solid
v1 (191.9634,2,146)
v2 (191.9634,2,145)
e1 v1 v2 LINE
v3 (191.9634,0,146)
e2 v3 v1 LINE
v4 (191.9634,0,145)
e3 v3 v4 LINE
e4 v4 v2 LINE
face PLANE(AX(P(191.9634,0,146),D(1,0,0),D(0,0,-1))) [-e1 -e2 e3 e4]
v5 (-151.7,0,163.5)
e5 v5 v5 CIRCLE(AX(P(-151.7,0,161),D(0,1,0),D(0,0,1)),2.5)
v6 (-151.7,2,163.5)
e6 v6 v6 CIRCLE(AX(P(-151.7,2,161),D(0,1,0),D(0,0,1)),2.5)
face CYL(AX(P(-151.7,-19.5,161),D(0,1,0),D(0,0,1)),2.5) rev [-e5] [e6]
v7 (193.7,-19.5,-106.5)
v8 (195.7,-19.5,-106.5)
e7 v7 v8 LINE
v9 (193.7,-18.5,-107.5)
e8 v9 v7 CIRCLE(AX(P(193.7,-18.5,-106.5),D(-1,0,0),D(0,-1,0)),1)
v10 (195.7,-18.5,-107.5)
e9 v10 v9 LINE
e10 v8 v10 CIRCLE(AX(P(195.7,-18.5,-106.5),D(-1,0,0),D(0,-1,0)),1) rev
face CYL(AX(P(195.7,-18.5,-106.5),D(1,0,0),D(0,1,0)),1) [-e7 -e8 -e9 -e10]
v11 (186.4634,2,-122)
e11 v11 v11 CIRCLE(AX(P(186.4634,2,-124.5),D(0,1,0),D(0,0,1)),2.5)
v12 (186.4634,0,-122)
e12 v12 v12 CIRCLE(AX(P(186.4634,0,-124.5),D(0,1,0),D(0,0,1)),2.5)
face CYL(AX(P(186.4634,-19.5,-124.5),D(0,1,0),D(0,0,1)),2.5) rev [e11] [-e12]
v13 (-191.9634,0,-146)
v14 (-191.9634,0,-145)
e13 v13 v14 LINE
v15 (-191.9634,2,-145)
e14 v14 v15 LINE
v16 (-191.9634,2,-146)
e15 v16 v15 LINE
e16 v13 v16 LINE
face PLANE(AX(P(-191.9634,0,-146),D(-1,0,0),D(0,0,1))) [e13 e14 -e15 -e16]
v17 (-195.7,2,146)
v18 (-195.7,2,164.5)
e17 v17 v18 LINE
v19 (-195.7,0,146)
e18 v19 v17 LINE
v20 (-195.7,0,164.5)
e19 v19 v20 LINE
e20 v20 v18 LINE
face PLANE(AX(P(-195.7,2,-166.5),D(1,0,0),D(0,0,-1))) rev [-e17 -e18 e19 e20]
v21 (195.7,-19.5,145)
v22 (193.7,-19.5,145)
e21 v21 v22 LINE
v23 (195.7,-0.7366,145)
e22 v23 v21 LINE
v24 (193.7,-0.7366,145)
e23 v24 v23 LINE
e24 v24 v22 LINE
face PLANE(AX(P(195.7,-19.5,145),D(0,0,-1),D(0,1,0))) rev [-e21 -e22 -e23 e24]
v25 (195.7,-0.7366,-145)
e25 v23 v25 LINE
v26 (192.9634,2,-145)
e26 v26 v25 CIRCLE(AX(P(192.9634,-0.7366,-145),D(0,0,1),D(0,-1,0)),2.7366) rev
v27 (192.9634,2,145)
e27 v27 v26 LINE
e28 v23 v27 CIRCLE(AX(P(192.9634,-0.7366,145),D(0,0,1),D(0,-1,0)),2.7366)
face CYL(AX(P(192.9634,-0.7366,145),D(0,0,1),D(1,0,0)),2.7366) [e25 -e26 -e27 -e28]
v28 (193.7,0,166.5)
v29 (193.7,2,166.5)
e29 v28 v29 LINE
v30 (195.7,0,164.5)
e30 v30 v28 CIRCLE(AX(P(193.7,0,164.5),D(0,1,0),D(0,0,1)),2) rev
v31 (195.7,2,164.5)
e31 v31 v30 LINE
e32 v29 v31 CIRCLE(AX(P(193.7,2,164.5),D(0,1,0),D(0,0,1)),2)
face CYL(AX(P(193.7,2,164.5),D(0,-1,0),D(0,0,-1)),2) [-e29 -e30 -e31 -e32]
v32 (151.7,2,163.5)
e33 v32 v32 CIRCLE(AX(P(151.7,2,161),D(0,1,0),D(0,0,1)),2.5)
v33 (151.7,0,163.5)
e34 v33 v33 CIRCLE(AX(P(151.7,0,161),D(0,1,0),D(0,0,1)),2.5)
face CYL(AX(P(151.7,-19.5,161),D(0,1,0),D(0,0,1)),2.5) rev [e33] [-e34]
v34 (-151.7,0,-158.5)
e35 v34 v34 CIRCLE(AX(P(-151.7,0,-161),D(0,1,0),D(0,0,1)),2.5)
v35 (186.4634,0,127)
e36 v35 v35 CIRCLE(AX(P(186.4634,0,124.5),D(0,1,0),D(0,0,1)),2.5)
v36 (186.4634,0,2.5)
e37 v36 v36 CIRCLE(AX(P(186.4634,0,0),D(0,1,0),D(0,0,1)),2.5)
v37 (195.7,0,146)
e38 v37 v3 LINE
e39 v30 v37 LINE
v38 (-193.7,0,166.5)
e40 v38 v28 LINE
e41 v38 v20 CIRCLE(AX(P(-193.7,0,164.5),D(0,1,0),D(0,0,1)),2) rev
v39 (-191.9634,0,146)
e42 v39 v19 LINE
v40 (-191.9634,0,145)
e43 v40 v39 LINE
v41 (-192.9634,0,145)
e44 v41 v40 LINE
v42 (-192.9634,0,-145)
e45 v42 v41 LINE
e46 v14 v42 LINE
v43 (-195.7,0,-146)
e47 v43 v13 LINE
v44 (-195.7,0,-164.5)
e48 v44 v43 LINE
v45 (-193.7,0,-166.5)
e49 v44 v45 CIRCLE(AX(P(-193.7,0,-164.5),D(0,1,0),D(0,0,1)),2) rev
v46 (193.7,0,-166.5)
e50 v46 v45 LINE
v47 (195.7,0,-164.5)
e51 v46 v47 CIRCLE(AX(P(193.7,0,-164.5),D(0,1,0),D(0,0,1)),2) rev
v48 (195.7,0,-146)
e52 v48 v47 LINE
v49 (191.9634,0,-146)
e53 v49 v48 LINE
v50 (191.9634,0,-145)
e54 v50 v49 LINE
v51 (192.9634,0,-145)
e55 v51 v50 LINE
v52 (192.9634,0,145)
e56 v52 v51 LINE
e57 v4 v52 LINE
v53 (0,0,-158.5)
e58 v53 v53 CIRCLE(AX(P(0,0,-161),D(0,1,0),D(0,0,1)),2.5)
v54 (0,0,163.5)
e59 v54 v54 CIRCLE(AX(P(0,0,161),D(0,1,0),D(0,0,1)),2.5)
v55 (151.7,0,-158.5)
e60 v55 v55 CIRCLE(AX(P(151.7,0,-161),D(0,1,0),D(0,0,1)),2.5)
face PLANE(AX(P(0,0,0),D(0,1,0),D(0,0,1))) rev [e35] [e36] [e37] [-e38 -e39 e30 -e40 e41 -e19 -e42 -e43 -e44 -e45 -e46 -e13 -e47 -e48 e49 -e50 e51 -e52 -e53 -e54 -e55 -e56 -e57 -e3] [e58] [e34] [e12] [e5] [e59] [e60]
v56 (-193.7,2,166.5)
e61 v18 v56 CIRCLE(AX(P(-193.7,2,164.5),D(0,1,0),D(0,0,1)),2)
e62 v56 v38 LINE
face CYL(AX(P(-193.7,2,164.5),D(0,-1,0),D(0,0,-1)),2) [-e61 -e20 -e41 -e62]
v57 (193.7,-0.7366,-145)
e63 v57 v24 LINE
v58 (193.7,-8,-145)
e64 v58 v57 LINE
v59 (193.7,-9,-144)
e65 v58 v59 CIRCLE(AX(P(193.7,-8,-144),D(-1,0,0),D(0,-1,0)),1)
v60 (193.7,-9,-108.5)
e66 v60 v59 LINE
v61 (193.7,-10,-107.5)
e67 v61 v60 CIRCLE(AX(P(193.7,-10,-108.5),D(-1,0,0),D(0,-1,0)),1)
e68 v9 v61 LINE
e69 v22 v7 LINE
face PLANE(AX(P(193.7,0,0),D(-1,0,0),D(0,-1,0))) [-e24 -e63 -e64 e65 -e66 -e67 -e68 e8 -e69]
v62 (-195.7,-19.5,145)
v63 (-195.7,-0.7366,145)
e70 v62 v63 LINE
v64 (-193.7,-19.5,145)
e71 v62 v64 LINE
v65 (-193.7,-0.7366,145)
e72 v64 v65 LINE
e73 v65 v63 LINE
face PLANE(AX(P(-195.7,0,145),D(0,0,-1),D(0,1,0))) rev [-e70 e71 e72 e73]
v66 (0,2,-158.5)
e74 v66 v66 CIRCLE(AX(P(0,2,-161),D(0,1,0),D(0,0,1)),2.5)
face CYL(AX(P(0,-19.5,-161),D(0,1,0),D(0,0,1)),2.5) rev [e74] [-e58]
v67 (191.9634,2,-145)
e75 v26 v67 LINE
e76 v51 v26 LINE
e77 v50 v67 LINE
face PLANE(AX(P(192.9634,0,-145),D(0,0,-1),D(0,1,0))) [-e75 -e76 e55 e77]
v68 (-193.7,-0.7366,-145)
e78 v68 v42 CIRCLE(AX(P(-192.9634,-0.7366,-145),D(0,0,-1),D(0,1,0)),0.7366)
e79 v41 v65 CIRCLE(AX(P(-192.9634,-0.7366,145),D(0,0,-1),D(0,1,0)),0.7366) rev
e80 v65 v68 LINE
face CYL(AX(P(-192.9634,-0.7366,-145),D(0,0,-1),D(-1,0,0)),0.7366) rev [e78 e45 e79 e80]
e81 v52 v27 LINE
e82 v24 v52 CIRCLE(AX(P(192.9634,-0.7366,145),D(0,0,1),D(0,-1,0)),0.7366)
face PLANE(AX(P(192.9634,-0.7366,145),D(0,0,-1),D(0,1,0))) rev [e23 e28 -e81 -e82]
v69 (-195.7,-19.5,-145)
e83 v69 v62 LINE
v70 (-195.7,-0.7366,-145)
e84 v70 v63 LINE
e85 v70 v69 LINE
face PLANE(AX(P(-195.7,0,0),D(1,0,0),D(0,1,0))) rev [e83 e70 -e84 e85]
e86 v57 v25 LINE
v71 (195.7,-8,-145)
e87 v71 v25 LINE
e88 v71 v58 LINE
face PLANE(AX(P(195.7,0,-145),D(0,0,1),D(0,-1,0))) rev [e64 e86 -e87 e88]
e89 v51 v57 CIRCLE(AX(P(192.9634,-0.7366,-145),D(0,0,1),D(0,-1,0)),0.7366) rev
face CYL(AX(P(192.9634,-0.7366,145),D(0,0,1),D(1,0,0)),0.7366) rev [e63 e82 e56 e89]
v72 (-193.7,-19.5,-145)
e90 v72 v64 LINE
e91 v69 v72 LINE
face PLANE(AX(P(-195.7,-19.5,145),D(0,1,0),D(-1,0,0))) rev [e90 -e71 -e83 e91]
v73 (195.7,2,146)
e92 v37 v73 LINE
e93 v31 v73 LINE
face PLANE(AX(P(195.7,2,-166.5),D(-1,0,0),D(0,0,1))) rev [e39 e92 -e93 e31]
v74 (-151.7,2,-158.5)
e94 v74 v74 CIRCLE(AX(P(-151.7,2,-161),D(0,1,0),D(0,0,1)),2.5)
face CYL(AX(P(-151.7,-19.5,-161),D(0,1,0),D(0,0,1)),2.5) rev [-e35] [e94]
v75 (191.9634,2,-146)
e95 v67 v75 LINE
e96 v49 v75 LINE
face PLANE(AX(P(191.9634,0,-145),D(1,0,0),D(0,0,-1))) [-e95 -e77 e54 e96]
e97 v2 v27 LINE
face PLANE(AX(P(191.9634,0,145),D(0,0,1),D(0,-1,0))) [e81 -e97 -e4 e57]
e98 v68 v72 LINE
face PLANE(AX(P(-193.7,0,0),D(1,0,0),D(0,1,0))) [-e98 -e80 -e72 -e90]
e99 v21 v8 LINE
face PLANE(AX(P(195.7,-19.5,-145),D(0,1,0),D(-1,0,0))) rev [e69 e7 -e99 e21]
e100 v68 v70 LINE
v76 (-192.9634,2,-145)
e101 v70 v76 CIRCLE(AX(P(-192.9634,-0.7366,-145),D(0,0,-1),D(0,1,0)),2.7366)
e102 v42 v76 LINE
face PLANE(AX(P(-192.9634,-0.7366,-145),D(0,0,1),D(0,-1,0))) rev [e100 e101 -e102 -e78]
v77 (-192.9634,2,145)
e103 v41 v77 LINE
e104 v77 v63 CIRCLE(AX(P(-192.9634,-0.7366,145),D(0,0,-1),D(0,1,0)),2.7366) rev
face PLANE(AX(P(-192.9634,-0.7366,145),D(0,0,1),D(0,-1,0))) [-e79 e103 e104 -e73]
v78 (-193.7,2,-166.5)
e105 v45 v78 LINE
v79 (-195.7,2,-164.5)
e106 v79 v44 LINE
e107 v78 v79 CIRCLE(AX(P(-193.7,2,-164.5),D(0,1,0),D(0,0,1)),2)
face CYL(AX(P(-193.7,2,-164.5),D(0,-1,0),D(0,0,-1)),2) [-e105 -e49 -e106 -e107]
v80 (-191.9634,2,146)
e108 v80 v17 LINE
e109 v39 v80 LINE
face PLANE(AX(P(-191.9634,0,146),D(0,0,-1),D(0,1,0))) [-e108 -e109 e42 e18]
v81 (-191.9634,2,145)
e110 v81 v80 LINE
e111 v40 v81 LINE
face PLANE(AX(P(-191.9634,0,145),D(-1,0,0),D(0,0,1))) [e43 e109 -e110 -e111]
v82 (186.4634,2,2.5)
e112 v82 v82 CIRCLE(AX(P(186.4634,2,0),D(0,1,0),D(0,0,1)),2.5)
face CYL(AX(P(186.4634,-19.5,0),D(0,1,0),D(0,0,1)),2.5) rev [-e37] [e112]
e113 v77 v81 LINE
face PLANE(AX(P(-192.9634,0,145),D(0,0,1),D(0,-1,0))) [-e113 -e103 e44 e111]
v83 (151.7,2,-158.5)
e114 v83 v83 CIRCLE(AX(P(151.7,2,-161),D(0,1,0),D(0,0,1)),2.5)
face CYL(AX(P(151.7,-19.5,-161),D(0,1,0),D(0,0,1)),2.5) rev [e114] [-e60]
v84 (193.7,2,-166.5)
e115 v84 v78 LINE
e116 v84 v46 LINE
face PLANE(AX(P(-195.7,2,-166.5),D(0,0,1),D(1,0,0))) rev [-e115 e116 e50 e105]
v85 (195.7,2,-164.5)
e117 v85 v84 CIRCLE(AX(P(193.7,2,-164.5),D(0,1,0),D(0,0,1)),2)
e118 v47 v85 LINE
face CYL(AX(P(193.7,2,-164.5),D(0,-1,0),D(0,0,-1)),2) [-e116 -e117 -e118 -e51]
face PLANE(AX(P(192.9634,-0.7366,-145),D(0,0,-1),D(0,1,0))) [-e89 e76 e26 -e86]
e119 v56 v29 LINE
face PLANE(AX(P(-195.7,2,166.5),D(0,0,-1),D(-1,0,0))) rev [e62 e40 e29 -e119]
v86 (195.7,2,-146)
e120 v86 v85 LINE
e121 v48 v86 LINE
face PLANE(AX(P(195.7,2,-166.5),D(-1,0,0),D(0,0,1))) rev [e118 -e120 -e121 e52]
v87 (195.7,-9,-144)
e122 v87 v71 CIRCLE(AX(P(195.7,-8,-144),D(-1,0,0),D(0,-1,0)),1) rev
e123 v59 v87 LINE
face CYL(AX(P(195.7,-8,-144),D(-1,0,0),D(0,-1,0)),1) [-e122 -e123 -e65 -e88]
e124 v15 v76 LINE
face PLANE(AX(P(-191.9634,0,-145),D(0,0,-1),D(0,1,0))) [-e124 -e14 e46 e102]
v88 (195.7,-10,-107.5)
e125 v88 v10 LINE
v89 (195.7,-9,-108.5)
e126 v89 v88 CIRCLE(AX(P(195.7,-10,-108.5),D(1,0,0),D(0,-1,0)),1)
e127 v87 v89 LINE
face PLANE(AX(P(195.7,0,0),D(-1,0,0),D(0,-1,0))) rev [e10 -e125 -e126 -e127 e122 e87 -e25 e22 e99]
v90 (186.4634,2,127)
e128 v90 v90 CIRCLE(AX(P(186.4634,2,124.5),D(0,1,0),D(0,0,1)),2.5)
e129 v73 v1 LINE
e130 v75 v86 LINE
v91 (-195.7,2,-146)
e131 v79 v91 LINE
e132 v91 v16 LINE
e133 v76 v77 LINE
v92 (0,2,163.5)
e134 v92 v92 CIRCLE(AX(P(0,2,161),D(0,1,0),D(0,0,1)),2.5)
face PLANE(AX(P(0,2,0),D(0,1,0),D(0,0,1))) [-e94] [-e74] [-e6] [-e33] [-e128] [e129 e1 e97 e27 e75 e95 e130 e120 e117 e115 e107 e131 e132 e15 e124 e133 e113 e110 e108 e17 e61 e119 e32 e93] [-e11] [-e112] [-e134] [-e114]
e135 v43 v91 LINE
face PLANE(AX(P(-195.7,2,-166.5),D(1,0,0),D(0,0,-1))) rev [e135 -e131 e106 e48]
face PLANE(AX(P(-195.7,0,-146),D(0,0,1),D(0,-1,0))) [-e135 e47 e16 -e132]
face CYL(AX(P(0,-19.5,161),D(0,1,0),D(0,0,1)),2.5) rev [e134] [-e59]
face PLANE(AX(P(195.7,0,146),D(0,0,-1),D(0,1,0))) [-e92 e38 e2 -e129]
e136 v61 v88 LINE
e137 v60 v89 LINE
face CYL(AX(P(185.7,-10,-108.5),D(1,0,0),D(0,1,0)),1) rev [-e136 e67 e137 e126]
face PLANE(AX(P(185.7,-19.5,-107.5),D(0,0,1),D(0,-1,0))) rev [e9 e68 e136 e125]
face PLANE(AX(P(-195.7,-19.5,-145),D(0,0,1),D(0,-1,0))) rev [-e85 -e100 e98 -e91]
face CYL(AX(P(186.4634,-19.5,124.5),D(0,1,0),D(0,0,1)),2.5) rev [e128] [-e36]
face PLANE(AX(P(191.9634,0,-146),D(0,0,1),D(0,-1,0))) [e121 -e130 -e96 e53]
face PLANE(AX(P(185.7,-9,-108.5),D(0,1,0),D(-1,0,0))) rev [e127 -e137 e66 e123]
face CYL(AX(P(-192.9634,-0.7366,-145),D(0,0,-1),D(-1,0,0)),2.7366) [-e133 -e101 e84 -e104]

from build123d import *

# Parameters (mm, degrees)
SKETCH1_W                       = 391.4
SKETCH1_H                       = 333
BASE_FLANGE1_DEPTH              = 2
EDGE_FLANGE1_STRIP_W            = 9.4732
EDGE_FLANGE1_STRIP_H            = 2
EDGE_FLANGE1_STRIP_CUT_DEPTH    = 290
EDGE_FLANGE1_RELIEF_W           = 10.4732
EDGE_FLANGE1_RELIEF_H           = 1
EDGE_FLANGE1_RELIEF_CUT_DEPTH   = 2
EDGE_FLANGE1_STRIP_2_W          = 9.4732
EDGE_FLANGE1_STRIP_2_H          = 2
EDGE_FLANGE1_STRIP_CUT_2_DEPTH  = 290
EDGE_FLANGE1_RELIEF_2_W         = 10.4732
EDGE_FLANGE1_RELIEF_2_H         = 1
EDGE_FLANGE1_RELIEF_CUT_2_DEPTH = 2
EDGE_FLANGE1_DEPTH              = 290
EDGE_FLANGE1_BEND_DEPTH         = 290
FILLET1_R                       = 2
CUT_EXTRUDE1_DEPTH              = 10
FILLET2_R                       = 1
CUT_EXTRUDE2_DEPTH              = 258.84295608
CUT_EXTRUDE2_DEPTH_BACK         = 258.84295608
SKETCH9_R                       = 2.5


# Sheet-metal steps are written as plain solids
with BuildPart() as part:
    # Sketch1 → Base-Flange1 (new body)
    with BuildSketch(Plane(origin=(0, 0, 0), x_dir=(1, 0, 0), z_dir=(0, 1, 0))):
        Rectangle(SKETCH1_W, SKETCH1_H)
    extrude(amount=BASE_FLANGE1_DEPTH)

    # Edge-Flange1 strip (across the edge) → Edge-Flange1 strip cut (cut)
    with BuildSketch(Plane(origin=(-195.7, 0, 145), x_dir=(1, 0, 0), z_dir=(0, 0, -1))):
        with Locations((-2, -1)):
            Rectangle(EDGE_FLANGE1_STRIP_W, EDGE_FLANGE1_STRIP_H)
    extrude(amount=EDGE_FLANGE1_STRIP_CUT_DEPTH, mode=Mode.SUBTRACT)

    # Edge-Flange1 relief (on the sheet) → Edge-Flange1 relief cut (cut)
    with BuildSketch(Plane(origin=(-192.9634, 0, 145), x_dir=(1, 0, 0), z_dir=(0, -1, 0))):
        with Locations((-4.2366, 0.5)):
            Rectangle(EDGE_FLANGE1_RELIEF_W, EDGE_FLANGE1_RELIEF_H)
        with Locations((-4.2366, -290.5)):
            Rectangle(EDGE_FLANGE1_RELIEF_W, EDGE_FLANGE1_RELIEF_H)
    extrude(amount=-EDGE_FLANGE1_RELIEF_CUT_DEPTH, mode=Mode.SUBTRACT)

    # Edge-Flange1 strip 2 (across the edge) → Edge-Flange1 strip cut 2 (cut)
    with BuildSketch(Plane(origin=(195.7, 0, -145), x_dir=(-1, 0, 0), z_dir=(0, 0, 1))):
        with Locations((-2, -1)):
            Rectangle(EDGE_FLANGE1_STRIP_2_W, EDGE_FLANGE1_STRIP_2_H)
    extrude(amount=EDGE_FLANGE1_STRIP_CUT_2_DEPTH, mode=Mode.SUBTRACT)

    # Edge-Flange1 relief 2 (on the sheet) → Edge-Flange1 relief cut 2 (cut)
    with BuildSketch(Plane(origin=(192.9634, 0, -145), x_dir=(-1, 0, 0), z_dir=(0, -1, 0))):
        with Locations((-4.2366, 0.5)):
            Rectangle(EDGE_FLANGE1_RELIEF_2_W, EDGE_FLANGE1_RELIEF_2_H)
        with Locations((-4.2366, -290.5)):
            Rectangle(EDGE_FLANGE1_RELIEF_2_W, EDGE_FLANGE1_RELIEF_2_H)
    extrude(amount=-EDGE_FLANGE1_RELIEF_CUT_2_DEPTH, mode=Mode.SUBTRACT)

    # Edge-Flange1 section (across the edge) → Edge-Flange1 (add)
    with BuildSketch(Plane(origin=(-195.7, 0, 145), x_dir=(1, 0, 0), z_dir=(0, 0, -1))):
        with BuildLine():
            Line((0, 0.7366), (0, 19.5))
            Line((0, 19.5), (2, 19.5))
            Line((2, 19.5), (2, 0.7366))
            ThreePointArc((2, 0.7366), (2.215745145, 0.215745145), (2.7366, 0))
            Line((2.7366, 0), (2.7366, -2))
            ThreePointArc((2.7366, -2), (0.801531583, -1.198468417), (0, 0.7366))
        make_face()
    extrude(amount=EDGE_FLANGE1_DEPTH)

    # Edge-Flange1 section 2 (across the edge) → Edge-Flange1 bend (add)
    with BuildSketch(Plane(origin=(195.7, 0, -145), x_dir=(-1, 0, 0), z_dir=(0, 0, 1))):
        with BuildLine():
            Line((0, 0.7366), (0, 19.5))
            Line((0, 19.5), (2, 19.5))
            Line((2, 19.5), (2, 0.7366))
            ThreePointArc((2, 0.7366), (2.215745145, 0.215745145), (2.7366, 0))
            Line((2.7366, 0), (2.7366, -2))
            ThreePointArc((2.7366, -2), (0.801531583, -1.198468417), (0, 0.7366))
        make_face()
    extrude(amount=EDGE_FLANGE1_BEND_DEPTH)

    # Fillet1
    fillet1_edges = [part.edges().sort_by_distance(p)[0] for p in [
        (195.7, 1, 166.5),
        (-195.7, 1, 166.5),
        (-195.7, 1, -166.5),
        (195.7, 1, -166.5),
    ]]
    fillet(fillet1_edges, radius=FILLET1_R)

    # Sketch8 → Cut-Extrude1 (cut)
    with BuildSketch(Plane(origin=(195.7, 0, 0), x_dir=(0, 0, -1), z_dir=(1, 0, 0))):
        with BuildLine():
            Line((107.5, -19.5), (147.855530229, -19.5))
            Line((147.855530229, -19.5), (147.855530229, -9))
            Line((147.855530229, -9), (108.5, -9))
            ThreePointArc((108.5, -9), (107.792893219, -9.292893219), (107.5, -10))
            Line((107.5, -10), (107.5, -19.5))
        make_face()
    extrude(amount=-CUT_EXTRUDE1_DEPTH, mode=Mode.SUBTRACT)

    # Fillet2
    fillet2_edges = [part.edges().sort_by_distance(p)[0] for p in [
        (194.7, -19.5, -107.5),
        (194.7, -9, -145),
    ]]
    fillet(fillet2_edges, radius=FILLET2_R)

    # Sketch9 → Cut-Extrude2 (cut, two sides: drawn at the far end of the back side and taken through both)
    with BuildSketch(Plane(origin=(0, 2, 0), x_dir=(1, 0, 0), z_dir=(0, 1, 0)).offset(-CUT_EXTRUDE2_DEPTH_BACK)):
        with Locations(Location((-151.7, -161, 0), (0, 0, 270))):
            Circle(SKETCH9_R)
        with Locations(Location((0, -161, 0), (0, 0, 270))):
            Circle(SKETCH9_R)
        with Locations(Location((151.7, -161, 0), (0, 0, 270))):
            Circle(SKETCH9_R)
        with Locations(Location((186.4634, -124.5, 0), (0, 0, 270))):
            Circle(SKETCH9_R)
        with Locations(Location((186.4634, 0, 0), (0, 0, 270))):
            Circle(SKETCH9_R)
        with Locations(Location((186.4634, 124.5, 0), (0, 0, 270))):
            Circle(SKETCH9_R)
        with Locations(Location((151.7, 161, 0), (0, 0, 270))):
            Circle(SKETCH9_R)
        with Locations(Location((0, 161, 0), (0, 0, 270))):
            Circle(SKETCH9_R)
        with Locations(Location((-151.7, 161, 0), (0, 0, 270))):
            Circle(SKETCH9_R)
    extrude(amount=CUT_EXTRUDE2_DEPTH + CUT_EXTRUDE2_DEPTH_BACK, mode=Mode.SUBTRACT)


solid = part.part
